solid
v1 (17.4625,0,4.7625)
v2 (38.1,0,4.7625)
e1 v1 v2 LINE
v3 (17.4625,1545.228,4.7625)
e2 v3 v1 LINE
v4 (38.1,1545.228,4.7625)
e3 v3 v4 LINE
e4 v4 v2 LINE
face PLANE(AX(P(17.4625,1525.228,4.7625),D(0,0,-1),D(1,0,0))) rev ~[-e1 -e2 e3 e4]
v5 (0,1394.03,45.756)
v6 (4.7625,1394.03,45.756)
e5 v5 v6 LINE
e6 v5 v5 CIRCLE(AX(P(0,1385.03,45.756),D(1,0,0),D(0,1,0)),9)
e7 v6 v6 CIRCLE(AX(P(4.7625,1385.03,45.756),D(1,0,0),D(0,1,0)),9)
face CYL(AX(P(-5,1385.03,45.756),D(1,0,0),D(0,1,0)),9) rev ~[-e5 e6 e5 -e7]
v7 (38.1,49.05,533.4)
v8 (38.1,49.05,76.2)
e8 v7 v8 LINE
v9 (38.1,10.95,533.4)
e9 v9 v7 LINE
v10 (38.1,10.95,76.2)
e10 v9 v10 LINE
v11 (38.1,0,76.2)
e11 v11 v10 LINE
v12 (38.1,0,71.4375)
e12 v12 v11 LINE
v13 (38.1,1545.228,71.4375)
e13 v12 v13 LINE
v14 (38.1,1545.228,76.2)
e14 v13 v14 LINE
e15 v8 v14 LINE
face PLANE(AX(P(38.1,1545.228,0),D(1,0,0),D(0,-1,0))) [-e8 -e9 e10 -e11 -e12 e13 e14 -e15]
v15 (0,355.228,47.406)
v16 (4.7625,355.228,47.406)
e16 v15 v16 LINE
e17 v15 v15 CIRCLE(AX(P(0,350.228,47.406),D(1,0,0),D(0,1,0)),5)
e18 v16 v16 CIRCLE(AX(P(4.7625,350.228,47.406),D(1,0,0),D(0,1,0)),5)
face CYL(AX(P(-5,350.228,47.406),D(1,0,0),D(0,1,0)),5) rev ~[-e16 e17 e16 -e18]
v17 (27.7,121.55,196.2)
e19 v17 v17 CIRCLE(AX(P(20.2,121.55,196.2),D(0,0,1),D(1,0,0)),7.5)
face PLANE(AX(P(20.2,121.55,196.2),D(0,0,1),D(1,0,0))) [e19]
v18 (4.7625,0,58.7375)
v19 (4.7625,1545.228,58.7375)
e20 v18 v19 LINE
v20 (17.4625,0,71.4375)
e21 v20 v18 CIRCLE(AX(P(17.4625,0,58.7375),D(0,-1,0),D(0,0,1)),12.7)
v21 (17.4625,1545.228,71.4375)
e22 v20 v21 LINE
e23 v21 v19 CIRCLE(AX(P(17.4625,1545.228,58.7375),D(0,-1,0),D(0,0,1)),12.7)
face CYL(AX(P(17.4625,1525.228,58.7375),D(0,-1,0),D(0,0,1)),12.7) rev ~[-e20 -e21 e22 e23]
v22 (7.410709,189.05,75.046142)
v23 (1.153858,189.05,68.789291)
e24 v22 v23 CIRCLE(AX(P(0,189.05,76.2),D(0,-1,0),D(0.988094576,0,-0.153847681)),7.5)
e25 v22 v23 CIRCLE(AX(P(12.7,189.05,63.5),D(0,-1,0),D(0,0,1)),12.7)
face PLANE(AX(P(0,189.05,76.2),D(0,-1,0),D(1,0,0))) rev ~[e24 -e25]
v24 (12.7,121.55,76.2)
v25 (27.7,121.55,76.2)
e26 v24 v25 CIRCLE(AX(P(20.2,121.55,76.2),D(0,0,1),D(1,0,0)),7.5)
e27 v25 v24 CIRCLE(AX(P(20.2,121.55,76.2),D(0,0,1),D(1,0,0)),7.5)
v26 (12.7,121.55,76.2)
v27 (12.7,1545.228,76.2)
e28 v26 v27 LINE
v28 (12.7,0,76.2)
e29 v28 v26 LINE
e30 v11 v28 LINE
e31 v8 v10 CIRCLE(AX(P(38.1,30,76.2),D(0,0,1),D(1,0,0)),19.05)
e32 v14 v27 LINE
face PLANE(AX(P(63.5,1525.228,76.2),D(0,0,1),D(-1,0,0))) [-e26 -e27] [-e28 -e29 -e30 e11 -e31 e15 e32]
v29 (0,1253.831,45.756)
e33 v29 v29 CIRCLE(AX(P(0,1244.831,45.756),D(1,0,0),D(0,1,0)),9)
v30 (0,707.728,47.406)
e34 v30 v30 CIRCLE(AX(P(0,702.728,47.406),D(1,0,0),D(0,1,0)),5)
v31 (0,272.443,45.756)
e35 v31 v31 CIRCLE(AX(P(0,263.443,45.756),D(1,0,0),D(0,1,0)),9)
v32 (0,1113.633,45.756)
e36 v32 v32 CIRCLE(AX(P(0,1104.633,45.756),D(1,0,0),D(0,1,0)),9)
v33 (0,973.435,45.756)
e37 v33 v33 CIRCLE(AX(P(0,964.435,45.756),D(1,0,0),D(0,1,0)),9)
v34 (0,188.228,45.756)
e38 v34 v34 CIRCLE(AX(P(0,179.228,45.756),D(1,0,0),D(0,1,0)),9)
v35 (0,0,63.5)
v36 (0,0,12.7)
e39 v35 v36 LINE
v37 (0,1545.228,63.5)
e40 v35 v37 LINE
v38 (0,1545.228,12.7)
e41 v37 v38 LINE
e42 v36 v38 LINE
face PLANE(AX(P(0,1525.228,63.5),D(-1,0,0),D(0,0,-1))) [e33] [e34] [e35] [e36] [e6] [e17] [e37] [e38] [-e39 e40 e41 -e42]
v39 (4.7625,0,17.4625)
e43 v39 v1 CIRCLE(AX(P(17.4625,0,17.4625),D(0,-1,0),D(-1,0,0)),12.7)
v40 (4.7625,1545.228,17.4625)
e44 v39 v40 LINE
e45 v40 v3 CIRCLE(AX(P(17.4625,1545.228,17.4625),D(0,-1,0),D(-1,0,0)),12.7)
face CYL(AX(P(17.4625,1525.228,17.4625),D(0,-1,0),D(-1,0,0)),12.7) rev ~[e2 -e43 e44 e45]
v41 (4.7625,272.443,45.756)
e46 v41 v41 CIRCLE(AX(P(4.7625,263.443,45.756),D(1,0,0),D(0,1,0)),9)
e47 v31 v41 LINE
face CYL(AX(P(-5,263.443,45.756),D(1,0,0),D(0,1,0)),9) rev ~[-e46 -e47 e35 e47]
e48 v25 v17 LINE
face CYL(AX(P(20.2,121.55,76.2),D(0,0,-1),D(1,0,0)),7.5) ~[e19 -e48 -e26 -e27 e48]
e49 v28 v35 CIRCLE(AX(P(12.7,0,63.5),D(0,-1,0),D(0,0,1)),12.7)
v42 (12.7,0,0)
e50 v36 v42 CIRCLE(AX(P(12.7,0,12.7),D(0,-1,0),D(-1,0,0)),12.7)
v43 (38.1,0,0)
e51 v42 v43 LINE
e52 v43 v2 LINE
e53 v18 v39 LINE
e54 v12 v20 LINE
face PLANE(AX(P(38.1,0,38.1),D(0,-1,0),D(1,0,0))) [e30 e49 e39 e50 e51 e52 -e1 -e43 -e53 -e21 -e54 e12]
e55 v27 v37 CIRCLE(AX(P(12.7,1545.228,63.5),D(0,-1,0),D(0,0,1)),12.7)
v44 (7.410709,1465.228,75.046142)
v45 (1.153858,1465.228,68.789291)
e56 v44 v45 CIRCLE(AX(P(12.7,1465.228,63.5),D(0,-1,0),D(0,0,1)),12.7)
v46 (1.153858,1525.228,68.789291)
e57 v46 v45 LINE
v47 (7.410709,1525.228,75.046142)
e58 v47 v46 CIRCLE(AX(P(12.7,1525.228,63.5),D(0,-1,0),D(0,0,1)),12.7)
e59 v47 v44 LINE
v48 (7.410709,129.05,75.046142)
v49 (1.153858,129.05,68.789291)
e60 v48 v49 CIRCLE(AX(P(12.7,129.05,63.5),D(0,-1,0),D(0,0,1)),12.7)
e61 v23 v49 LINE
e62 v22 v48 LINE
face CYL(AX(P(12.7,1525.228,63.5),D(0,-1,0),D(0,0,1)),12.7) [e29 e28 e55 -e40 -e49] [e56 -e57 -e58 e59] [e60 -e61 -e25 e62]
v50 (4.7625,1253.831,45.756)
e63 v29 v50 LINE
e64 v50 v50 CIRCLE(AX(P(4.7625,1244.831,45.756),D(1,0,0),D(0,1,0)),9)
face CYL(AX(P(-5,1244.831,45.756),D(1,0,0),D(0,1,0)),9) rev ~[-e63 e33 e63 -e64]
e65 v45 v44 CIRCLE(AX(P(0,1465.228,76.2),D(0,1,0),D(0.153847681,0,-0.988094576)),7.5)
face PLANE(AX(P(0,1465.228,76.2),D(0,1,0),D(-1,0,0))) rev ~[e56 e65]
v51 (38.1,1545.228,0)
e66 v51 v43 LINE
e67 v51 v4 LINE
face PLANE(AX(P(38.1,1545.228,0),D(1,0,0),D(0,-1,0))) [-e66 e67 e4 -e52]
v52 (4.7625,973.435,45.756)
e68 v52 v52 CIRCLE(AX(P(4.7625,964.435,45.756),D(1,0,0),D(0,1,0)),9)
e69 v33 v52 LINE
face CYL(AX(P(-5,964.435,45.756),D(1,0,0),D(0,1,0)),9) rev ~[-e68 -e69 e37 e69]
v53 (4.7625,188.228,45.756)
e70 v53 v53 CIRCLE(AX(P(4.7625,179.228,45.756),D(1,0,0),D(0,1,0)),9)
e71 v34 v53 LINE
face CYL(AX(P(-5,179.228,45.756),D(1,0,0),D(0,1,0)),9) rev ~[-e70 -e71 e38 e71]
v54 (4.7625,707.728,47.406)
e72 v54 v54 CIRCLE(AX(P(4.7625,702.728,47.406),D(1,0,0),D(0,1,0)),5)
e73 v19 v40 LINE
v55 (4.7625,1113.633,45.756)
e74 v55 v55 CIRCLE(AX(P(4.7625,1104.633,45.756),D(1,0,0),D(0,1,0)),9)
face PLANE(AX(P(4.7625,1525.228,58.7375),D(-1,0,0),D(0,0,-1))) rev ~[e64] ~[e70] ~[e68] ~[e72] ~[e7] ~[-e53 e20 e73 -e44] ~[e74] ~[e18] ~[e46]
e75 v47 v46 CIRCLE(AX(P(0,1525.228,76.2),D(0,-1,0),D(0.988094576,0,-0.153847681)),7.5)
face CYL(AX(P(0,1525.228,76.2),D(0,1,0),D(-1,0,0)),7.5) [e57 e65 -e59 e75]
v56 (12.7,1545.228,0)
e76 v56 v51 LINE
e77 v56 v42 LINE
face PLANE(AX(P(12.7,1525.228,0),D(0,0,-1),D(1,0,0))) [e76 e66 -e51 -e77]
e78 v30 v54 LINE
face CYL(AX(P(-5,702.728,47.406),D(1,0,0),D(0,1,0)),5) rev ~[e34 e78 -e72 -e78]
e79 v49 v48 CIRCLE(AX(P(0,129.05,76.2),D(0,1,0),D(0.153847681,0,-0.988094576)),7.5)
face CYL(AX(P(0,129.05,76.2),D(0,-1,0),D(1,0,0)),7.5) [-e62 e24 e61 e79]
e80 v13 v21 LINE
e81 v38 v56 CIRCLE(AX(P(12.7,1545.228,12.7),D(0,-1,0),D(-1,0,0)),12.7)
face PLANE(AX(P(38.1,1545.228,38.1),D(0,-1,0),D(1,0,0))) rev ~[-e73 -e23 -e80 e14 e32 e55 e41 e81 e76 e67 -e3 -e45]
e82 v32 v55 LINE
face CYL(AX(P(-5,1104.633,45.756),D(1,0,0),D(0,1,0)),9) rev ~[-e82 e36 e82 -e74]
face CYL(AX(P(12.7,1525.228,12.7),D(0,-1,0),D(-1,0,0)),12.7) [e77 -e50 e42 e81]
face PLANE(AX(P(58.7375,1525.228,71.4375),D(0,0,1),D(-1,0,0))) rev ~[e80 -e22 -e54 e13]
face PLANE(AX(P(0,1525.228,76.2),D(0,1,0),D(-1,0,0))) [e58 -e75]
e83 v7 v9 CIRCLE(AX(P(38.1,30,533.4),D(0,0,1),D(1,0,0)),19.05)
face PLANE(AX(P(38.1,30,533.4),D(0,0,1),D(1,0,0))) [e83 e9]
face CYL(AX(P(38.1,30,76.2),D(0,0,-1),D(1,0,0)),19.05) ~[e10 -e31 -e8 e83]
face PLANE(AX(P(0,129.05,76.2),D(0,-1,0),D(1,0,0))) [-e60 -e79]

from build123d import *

# Parameters (mm, degrees)
F1_DEPTH  = 1525.228
F3_DEPTH  = 1525.228
F5_D      = 19
F5_DEPTH  = 5
F5_TIP    = 5.7081758808
F7_D      = 9
F7_DEPTH  = 5
F7_TIP    = 2.7038727856
F8_R      = 19.05
F9_DEPTH  = 457.2
F10_R     = 7.5
F11_DEPTH = 120
F12_DEPTH = 20
F16_R     = 7.5
F17_DEPTH = 60
F22_R     = 7.5
F23_DEPTH = 60
F28_D     = 15
F28_DEPTH = 5
F28_TIP   = 4.5064546427
F30_D     = 18
F30_DEPTH = 5
F30_TIP   = 5.4077455712
F32_D     = 10
F32_DEPTH = 5
F32_TIP   = 3.0043030951
F33_W     = 75
F33_H     = 1545.228
F34_DEPTH = 2500


# Not quite as in the source:
# - a feature names something its author has since deleted; it is built from what else it names


with BuildPart() as f1:
    # F0 (on Front) → F1 (new body)
    with BuildSketch(Plane.XZ):
        with BuildLine():
            ThreePointArc((0, 12.7), (3.7197438789, 3.7197438789), (12.7, 0))
            Line((12.7, 0), (63.5, 0))
            ThreePointArc((63.5, 0), (72.4802561211, 3.7197438789), (76.2, 12.7))
            Line((76.2, 12.7), (76.2, 63.5))
            ThreePointArc((76.2, 63.5), (72.4802561211, 72.4802561211), (63.5, 76.2))
            Line((63.5, 76.2), (12.7, 76.2))
            ThreePointArc((12.7, 76.2), (3.7197438789, 72.4802561211), (0, 63.5))
            Line((0, 63.5), (0, 12.7))
        make_face()
    extrude(amount=-F1_DEPTH)

    # F2 (on face) → F3 (cut)
    with BuildSketch(Plane.XZ):
        with BuildLine():
            Line((17.4625, 4.7625), (38.1, 4.7625))
            Line((38.1, 4.7625), (58.7375, 4.7625))
            ThreePointArc((58.7375, 4.7625), (67.7177561211, 8.4822438789), (71.4375, 17.4625))
            Line((71.4375, 17.4625), (71.4375, 58.7375))
            ThreePointArc((71.4375, 58.7375), (67.7177561211, 67.7177561211), (58.7375, 71.4375))
            Line((58.7375, 71.4375), (17.4625, 71.4375))
            ThreePointArc((17.4625, 71.4375), (8.4822438789, 67.7177561211), (4.7625, 58.7375))
            Line((4.7625, 58.7375), (4.7625, 17.4625))
            ThreePointArc((4.7625, 17.4625), (8.4822438789, 8.4822438789), (17.4625, 4.7625))
        make_face()
    extrude(amount=-F3_DEPTH, mode=Mode.SUBTRACT)

    # F5
    with Locations(Plane.YZ.offset(76.2)):
        with Locations((1335.228, 46.2), (1105.028, 46.2), (653.528, 46.2), (381.528, 46.2), (179.528, 46.2)):
            Hole(F5_D / 2, depth=F5_DEPTH)
            with Locations((0, 0, -(F5_DEPTH + F5_TIP / 2))):  # 118° drill point
                Cone(0, F5_D / 2, F5_TIP, mode=Mode.SUBTRACT)

    # F7
    with Locations(Plane.YZ.offset(76.2)):
        with Locations((261.933, 31.2), (501.133, 31.2), (760.333, 31.2), (979.533, 31.2), (1218.698, 31.2)):
            Hole(F7_D / 2, depth=F7_DEPTH)
            with Locations((0, 0, -(F7_DEPTH + F7_TIP / 2))):  # 118° drill point
                Cone(0, F7_D / 2, F7_TIP, mode=Mode.SUBTRACT)

    # F8 (on face) → F9 (join)
    with BuildSketch(Plane.XY.offset(76.2)):
        with Locations((38.1, 30)):
            Circle(F8_R)
    extrude(amount=F9_DEPTH)

    # F10 (on face) → F11 (join)
    with BuildSketch(Plane.XY.offset(76.2)):
        with Locations((20.2, 121.55)):
            Circle(F10_R)
    extrude(amount=F11_DEPTH)

    # F12 (add): a face of the model
    f12_faces = [f1.faces().sort_by_distance(p)[0] for p in [
        (1.0776307345, 1525.228, 38.1),
    ]]
    extrude(f12_faces, amount=F12_DEPTH)

    # F16 (on 3pt) → F17 (join)
    with BuildSketch(Plane.XZ.offset(-129.05)):
        with Locations((0, 76.2)):
            Circle(F16_R)
    extrude(amount=-F17_DEPTH)

    # F22 (on 3pt) → F23 (join)
    with BuildSketch(Plane(origin=(0, 1525.228, 0), x_dir=(-1, 0, 0), z_dir=(0, 1, 0))):
        with Locations((0, 76.2)):
            Circle(F22_R)
    extrude(amount=-F23_DEPTH)

    # F28
    with Locations(Plane.YZ.offset(76.2)):
        with Locations((1442.058, 31.2)):
            Hole(F28_D / 2, depth=F28_DEPTH)
            with Locations((0, 0, -(F28_DEPTH + F28_TIP / 2))):  # 118° drill point
                Cone(0, F28_D / 2, F28_TIP, mode=Mode.SUBTRACT)

    # F30
    with Locations(Plane(origin=(0, 0, 0), x_dir=(0, -1, 0), z_dir=(-1, 0, 0))):
        with Locations((-1385.03, 45.756), (-1244.831, 45.756), (-1104.633, 45.756), (-964.435, 45.756), (-263.443, 45.756), (-179.228, 45.756)):
            Hole(F30_D / 2, depth=F30_DEPTH)
            with Locations((0, 0, -(F30_DEPTH + F30_TIP / 2))):  # 118° drill point
                Cone(0, F30_D / 2, F30_TIP, mode=Mode.SUBTRACT)

    # F32
    with Locations(Plane(origin=(0, 0, 0), x_dir=(0, -1, 0), z_dir=(-1, 0, 0))):
        with Locations((-702.728, 47.406), (-350.228, 47.406)):
            Hole(F32_D / 2, depth=F32_DEPTH)
            with Locations((0, 0, -(F32_DEPTH + F32_TIP / 2))):  # 118° drill point
                Cone(0, F32_D / 2, F32_TIP, mode=Mode.SUBTRACT)

    # F33 (on face) → F34 (cut)
    with BuildSketch(Plane(origin=(0, 0, 0), x_dir=(1, 0, 0), z_dir=(0, 0, -1))):
        with Locations((75.6, -772.614)):
            Rectangle(F33_W, F33_H)
    extrude(amount=-F34_DEPTH, mode=Mode.SUBTRACT)


solid = f1.part
